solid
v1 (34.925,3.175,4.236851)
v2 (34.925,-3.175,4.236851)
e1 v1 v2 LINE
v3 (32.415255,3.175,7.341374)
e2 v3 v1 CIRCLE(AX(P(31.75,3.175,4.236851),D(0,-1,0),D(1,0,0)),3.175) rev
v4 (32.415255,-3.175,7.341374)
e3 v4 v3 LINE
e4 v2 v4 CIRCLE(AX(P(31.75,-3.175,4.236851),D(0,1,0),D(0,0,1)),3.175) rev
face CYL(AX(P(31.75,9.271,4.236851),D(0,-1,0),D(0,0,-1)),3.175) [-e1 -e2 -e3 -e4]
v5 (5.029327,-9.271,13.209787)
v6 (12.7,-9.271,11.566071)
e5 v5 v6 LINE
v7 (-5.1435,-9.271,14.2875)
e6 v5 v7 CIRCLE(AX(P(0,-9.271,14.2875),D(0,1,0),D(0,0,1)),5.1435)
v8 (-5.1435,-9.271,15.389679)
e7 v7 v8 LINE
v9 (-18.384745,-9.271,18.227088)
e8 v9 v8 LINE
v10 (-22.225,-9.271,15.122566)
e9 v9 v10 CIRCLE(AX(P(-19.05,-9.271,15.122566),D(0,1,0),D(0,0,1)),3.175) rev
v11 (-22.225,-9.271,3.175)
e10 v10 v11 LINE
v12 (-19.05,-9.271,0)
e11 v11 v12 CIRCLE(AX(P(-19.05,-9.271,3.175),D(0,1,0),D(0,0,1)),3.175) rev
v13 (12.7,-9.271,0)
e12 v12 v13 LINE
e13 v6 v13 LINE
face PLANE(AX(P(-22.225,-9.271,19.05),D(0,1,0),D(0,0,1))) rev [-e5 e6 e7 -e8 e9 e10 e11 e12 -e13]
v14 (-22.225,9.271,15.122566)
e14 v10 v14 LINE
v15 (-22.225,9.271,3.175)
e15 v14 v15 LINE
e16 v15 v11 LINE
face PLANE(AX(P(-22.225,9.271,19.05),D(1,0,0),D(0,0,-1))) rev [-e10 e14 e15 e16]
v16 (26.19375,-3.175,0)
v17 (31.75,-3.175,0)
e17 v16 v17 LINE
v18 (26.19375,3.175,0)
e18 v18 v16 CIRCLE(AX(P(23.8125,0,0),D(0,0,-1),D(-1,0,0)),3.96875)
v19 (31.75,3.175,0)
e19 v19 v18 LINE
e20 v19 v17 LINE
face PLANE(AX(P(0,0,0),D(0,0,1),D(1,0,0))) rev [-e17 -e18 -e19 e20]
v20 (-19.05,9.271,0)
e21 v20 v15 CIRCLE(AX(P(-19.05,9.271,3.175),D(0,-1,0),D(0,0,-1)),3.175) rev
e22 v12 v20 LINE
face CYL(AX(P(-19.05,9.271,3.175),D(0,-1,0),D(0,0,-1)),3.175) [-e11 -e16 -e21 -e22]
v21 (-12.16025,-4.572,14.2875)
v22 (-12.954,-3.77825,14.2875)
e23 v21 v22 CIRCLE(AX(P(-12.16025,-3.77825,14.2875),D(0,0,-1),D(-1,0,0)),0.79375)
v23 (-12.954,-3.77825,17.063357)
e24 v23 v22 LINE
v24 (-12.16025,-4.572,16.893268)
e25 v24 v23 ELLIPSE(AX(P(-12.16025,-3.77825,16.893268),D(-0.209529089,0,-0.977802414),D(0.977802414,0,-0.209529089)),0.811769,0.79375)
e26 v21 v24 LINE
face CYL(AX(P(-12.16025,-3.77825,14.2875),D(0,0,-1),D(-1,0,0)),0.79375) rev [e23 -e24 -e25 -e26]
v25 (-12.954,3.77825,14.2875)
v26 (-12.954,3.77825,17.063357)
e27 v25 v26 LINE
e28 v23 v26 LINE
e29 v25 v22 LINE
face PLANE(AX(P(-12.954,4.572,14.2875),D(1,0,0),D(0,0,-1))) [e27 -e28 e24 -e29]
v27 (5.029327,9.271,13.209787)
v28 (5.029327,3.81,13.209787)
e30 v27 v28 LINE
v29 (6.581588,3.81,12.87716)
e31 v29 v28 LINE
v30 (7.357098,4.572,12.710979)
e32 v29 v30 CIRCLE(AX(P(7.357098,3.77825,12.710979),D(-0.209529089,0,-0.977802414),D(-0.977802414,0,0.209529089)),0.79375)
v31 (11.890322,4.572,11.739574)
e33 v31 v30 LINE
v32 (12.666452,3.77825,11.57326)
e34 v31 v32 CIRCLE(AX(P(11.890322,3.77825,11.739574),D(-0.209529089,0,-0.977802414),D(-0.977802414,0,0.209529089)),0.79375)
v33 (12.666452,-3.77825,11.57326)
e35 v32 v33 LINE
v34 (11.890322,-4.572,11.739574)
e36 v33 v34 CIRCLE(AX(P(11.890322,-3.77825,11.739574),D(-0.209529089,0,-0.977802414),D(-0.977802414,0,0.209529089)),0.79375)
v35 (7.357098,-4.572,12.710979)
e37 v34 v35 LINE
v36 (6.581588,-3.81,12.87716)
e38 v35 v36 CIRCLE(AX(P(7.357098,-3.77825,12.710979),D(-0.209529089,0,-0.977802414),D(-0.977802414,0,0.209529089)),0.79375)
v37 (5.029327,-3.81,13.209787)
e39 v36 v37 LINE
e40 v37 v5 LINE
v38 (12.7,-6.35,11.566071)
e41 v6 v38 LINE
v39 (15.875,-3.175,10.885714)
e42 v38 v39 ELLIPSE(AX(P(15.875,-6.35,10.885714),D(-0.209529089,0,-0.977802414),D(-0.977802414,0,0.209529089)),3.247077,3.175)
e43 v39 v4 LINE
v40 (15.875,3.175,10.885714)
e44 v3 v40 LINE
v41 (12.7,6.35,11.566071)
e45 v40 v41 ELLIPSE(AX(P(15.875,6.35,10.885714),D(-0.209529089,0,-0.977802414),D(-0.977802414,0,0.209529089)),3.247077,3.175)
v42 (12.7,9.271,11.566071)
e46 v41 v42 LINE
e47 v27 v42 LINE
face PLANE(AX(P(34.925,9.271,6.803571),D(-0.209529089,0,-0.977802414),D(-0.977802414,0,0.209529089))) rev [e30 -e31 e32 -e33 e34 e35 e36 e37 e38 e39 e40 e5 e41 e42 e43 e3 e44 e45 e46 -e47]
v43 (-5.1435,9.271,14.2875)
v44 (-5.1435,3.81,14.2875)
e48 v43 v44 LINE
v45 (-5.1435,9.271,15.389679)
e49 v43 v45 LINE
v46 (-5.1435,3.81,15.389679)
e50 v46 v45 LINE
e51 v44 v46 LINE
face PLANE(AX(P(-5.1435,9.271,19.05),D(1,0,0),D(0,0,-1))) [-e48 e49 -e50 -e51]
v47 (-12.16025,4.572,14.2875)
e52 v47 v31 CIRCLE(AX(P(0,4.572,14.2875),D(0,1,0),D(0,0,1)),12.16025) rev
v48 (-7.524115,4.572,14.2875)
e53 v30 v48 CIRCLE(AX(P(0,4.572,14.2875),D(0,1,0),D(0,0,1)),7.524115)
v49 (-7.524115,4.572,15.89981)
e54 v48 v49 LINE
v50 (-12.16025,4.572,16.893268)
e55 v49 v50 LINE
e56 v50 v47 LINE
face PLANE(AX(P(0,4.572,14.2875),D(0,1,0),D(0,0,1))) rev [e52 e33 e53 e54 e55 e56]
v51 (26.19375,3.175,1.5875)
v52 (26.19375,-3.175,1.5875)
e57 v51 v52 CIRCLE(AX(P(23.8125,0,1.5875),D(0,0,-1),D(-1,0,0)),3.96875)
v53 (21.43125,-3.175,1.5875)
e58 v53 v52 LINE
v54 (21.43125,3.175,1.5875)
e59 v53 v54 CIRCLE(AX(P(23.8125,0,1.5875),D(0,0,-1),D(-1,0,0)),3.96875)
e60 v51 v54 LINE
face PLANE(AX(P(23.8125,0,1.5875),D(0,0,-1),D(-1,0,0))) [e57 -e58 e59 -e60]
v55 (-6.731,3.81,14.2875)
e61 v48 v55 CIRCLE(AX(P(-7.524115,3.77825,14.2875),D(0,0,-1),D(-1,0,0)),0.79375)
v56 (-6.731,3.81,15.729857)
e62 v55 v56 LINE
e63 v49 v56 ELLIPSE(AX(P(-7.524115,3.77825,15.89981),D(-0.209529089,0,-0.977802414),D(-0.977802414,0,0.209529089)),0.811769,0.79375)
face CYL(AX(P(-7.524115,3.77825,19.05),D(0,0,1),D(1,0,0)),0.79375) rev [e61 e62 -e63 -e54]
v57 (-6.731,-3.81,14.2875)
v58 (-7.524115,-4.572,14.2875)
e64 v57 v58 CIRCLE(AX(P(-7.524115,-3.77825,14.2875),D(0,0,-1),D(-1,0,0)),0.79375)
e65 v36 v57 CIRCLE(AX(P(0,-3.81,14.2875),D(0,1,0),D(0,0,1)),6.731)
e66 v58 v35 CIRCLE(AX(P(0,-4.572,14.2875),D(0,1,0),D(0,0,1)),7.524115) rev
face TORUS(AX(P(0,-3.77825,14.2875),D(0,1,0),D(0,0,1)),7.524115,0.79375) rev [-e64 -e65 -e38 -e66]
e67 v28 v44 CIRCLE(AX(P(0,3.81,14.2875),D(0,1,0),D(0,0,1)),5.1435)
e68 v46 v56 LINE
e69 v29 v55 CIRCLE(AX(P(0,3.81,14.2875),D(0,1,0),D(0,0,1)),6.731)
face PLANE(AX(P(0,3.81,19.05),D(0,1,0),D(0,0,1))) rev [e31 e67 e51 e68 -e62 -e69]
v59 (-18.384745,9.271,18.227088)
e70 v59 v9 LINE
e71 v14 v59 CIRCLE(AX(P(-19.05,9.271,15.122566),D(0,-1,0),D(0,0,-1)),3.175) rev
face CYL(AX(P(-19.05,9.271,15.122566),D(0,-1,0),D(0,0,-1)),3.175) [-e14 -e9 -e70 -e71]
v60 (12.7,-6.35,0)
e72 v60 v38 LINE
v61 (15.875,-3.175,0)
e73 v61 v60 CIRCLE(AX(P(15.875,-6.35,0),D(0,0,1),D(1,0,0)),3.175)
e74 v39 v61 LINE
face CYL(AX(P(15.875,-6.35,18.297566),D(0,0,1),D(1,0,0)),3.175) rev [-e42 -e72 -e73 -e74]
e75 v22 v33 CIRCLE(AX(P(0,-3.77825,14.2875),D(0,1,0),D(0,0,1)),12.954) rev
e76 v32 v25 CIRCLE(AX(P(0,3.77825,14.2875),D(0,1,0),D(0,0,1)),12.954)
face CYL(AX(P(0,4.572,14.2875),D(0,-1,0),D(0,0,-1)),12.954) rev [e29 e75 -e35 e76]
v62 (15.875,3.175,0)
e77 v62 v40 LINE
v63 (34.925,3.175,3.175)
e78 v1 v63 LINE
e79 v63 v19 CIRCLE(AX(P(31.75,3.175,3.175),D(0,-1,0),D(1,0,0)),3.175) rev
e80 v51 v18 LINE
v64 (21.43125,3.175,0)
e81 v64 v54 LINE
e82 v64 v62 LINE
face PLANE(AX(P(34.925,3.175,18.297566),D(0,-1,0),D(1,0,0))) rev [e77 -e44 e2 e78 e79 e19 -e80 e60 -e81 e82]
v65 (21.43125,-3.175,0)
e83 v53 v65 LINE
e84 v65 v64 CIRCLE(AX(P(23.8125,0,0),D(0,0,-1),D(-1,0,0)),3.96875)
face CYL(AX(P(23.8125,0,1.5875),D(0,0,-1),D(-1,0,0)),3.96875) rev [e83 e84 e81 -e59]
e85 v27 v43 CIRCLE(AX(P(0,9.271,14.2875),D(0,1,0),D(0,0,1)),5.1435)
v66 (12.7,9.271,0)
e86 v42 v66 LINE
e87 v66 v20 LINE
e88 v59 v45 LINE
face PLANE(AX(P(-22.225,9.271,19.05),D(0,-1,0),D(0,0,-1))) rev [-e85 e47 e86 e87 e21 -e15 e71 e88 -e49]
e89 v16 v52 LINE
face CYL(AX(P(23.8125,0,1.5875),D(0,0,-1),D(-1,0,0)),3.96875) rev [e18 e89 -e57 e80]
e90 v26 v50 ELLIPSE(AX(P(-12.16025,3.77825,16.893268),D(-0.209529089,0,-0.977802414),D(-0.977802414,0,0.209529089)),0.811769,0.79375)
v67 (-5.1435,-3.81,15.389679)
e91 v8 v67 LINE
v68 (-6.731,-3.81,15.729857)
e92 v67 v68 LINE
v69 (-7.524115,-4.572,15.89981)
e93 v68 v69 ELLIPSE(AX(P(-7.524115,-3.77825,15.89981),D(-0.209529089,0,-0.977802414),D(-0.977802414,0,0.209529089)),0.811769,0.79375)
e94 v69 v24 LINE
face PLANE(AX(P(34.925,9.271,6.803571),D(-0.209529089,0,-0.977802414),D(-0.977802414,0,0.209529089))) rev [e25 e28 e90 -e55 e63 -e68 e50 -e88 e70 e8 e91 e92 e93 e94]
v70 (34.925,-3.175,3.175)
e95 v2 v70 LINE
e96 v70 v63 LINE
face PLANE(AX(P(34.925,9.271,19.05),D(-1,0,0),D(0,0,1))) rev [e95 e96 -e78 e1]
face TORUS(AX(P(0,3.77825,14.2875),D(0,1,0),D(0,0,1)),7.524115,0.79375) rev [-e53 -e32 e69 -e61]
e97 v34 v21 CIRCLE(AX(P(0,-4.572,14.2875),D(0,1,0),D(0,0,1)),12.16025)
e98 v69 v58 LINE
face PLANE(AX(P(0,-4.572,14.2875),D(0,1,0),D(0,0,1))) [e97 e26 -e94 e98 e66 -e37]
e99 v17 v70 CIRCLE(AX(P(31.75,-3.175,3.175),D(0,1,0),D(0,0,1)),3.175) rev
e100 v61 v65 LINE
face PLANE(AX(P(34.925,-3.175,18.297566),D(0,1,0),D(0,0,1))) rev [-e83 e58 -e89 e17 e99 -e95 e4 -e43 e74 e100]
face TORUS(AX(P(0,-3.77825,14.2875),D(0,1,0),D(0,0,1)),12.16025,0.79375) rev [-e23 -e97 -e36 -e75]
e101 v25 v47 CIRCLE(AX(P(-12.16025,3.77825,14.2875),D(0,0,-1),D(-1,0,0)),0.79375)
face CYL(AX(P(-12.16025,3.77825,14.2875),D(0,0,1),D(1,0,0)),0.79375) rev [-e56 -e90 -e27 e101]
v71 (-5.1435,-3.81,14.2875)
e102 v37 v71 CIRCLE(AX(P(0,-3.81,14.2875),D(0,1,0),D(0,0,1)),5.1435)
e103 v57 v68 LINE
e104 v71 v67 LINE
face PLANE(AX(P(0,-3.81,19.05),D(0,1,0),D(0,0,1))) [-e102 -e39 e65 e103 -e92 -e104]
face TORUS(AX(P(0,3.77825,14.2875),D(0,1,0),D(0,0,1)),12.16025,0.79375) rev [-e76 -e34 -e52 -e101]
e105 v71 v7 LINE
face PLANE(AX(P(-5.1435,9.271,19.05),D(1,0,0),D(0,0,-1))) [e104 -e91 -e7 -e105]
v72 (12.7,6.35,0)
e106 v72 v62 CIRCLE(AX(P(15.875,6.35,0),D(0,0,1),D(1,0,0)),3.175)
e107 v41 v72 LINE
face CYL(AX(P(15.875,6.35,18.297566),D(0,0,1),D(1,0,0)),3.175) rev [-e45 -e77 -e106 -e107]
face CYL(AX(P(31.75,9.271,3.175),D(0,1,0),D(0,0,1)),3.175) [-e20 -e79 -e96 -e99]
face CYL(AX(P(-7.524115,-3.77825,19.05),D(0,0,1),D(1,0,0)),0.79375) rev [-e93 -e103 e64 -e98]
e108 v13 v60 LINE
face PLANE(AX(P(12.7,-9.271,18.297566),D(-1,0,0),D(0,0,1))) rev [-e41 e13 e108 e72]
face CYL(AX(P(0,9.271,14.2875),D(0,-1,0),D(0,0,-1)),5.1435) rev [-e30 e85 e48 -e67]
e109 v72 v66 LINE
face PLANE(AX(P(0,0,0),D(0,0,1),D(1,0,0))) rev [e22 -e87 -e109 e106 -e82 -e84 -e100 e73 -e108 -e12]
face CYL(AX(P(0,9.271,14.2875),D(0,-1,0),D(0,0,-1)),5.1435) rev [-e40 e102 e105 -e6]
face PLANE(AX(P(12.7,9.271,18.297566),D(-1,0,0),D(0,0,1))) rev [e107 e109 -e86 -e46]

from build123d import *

# Parameters (mm, degrees)
SKETCH1_W               = 57.15
SKETCH1_H               = 18.542
BOSS_EXTRUDE1_DEPTH     = 19.05
CUT_EXTRUDE1_DEPTH      = 41.848617676
CUT_EXTRUDE1_DEPTH_BACK = 41.848617676
CUT_EXTRUDE2_DEPTH      = 4.572
CUT_EXTRUDE2_DEPTH_BACK = 4.572
CUT_EXTRUDE3_DEPTH      = 3.81
CUT_EXTRUDE3_DEPTH_BACK = 3.81
CUT_EXTRUDE5_DEPTH      = 44.89150133
FILLET1_R               = 3.175
SKETCH9_R               = 3.96875
CUT_EXTRUDE6_DEPTH      = 1.5875
SKETCH10_W              = 22.225
SKETCH10_H              = 6.096
CUT_EXTRUDE7_DEPTH      = 41.503184716
FILLET2_R               = 3.175
FILLET3_R               = 0.79375


with BuildPart() as part:
    # Sketch1 → Boss-Extrude1 (new body)
    with BuildSketch(Plane.XY):
        with Locations((6.35, 0)):
            Rectangle(SKETCH1_W, SKETCH1_H)
    extrude(amount=BOSS_EXTRUDE1_DEPTH)

    # Sketch3 → Cut-Extrude1 (cut, two sides: drawn at the far end of the back side and taken through both)
    with BuildSketch(Plane(origin=(0, 0, 0), x_dir=(1, 0, 0), z_dir=(0, 1, 0)).offset(-CUT_EXTRUDE1_DEPTH_BACK)):
        with BuildLine():
            Line((-5.1435, -19.05), (-5.1435, -14.2875))
            ThreePointArc((-5.1435, -14.2875), (0, -9.144), (5.1435, -14.2875))
            Line((5.1435, -14.2875), (5.1435, -19.05))
            ThreePointArc((5.1435, -19.05), (0, -24.1935), (-5.1435, -19.05))
        make_face()
    extrude(amount=CUT_EXTRUDE1_DEPTH + CUT_EXTRUDE1_DEPTH_BACK, mode=Mode.SUBTRACT)

    # Sketch5 → Cut-Extrude2 (cut, two sides: drawn at the far end of the back side and taken through both)
    with BuildSketch(Plane(origin=(0, 0, 0), x_dir=(1, 0, 0), z_dir=(0, 1, 0)).offset(-CUT_EXTRUDE2_DEPTH_BACK)):
        with BuildLine():
            Line((12.954, -14.2875), (12.954, -19.05))
            ThreePointArc((12.954, -19.05), (0, -32.004), (-12.954, -19.05))
            Line((-12.954, -19.05), (-12.954, -14.2875))
            ThreePointArc((-12.954, -14.2875), (0, -1.3335), (12.954, -14.2875))
        make_face()
        with BuildLine():
            Line((-6.731, -19.05), (-6.731, -14.2875))
            ThreePointArc((-6.731, -14.2875), (0, -7.5565), (6.731, -14.2875))
            Line((6.731, -14.2875), (6.731, -19.05))
            ThreePointArc((6.731, -19.05), (0, -25.781), (-6.731, -19.05))
        make_face(mode=Mode.SUBTRACT)
    extrude(amount=CUT_EXTRUDE2_DEPTH + CUT_EXTRUDE2_DEPTH_BACK, mode=Mode.SUBTRACT)

    # Sketch6 → Cut-Extrude3 (cut, two sides: drawn at the far end of the back side and taken through both)
    with BuildSketch(Plane(origin=(0, 0, 0), x_dir=(1, 0, 0), z_dir=(0, 1, 0)).offset(-CUT_EXTRUDE3_DEPTH_BACK)):
        with BuildLine():
            Line((-8.3185, -19.05), (-8.3185, -14.2875))
            ThreePointArc((-8.3185, -14.2875), (0, -5.969), (8.3185, -14.2875))
            Line((8.3185, -14.2875), (8.3185, -19.05))
            ThreePointArc((8.3185, -19.05), (0, -27.3685), (-8.3185, -19.05))
        make_face()
    extrude(amount=CUT_EXTRUDE3_DEPTH + CUT_EXTRUDE3_DEPTH_BACK, mode=Mode.SUBTRACT)

    # Sketch8 → Cut-Extrude5 (cut, through all)
    with BuildSketch(Plane.XZ.offset(9.271)):
        Polygon((-22.225, 19.05), (34.925, 19.05), (34.925, 6.803571429), align=None)
    extrude(amount=-CUT_EXTRUDE5_DEPTH, mode=Mode.SUBTRACT)

    # Fillet1
    fillet1_edges = [part.edges().sort_by_distance(p)[0] for p in [
        (-22.225, 0, 19.05),
        (34.925, 0, 6.803571429),
        (-22.225, 0, 0),
        (34.925, 0, 0),
    ]]
    fillet(fillet1_edges, radius=FILLET1_R)

    # Sketch9 → Cut-Extrude6 (cut)
    with BuildSketch(Plane(origin=(0, 0, 0), x_dir=(-1, 0, 0), z_dir=(0, 0, -1))):
        with Locations((-23.8125, 0)):
            Circle(SKETCH9_R)
    extrude(amount=-CUT_EXTRUDE6_DEPTH, mode=Mode.SUBTRACT)

    # Sketch10 → Cut-Extrude7 (cut, through all)
    with BuildSketch(Plane(origin=(0, 0, 0), x_dir=(-1, 0, 0), z_dir=(0, 0, -1))):
        with Locations((-23.8125, 6.223)):
            Rectangle(SKETCH10_W, SKETCH10_H)
        with Locations((-23.8125, -6.223)):
            Rectangle(SKETCH10_W, SKETCH10_H)
    extrude(amount=-CUT_EXTRUDE7_DEPTH, mode=Mode.SUBTRACT)

    # Fillet2
    fillet2_edges = [part.edges().sort_by_distance(p)[0] for p in [
        (12.7, 3.175, 5.783035714),
        (12.7, -3.175, 5.783035714),
    ]]
    fillet(fillet2_edges, radius=FILLET2_R)

    # Fillet3
    # the kernel refuses this fillet: 0.79375 mm, written as the material it adds along each edge
    with BuildSketch(Plane(origin=(-6.731, 4.572, 17.714232143), x_dir=(-1, 0, 0), z_dir=(0, 0, -1))) as fillet3_piece_1_section:
        with BuildLine():
            CenterArc((FILLET3_R, -FILLET3_R), FILLET3_R, 90, 90)
            Line((0, -FILLET3_R), (0, 0))
            Line((0, 0), (FILLET3_R, 0))
        make_face()
    fillet3_piece_1 = extrude(amount=3.426732143, mode=Mode.PRIVATE)
    fillet3_piece_1 = split(fillet3_piece_1, bisect_by=Plane(origin=(-6.763728877, 4.396665284, 15.736870474), z_dir=(-0.2095290887308735, 0, -0.9778024140774095)), keep=Keep.TOP, mode=Mode.PRIVATE)
    fillet3_piece_1 = split(fillet3_piece_1, bisect_by=Plane(origin=(-6.915533266, 3.81, 15.028449993), z_dir=(0, 1, 0)), keep=Keep.TOP, mode=Mode.PRIVATE)
    add(fillet3_piece_1)
    with BuildSketch(Plane(origin=(-6.731, -4.572, 17.714232143), x_dir=(-1, 0, 0), z_dir=(0, 0, -1))) as fillet3_piece_2_section:
        with BuildLine():
            CenterArc((FILLET3_R, FILLET3_R), FILLET3_R, 180, 90)
            Line((0, FILLET3_R), (0, 0))
            Line((0, 0), (FILLET3_R, 0))
        make_face()
    fillet3_piece_2 = extrude(amount=3.426732143, mode=Mode.PRIVATE)
    fillet3_piece_2 = split(fillet3_piece_2, bisect_by=Plane(origin=(-6.763728877, -4.396665284, 15.736870474), z_dir=(-0.2095290887308735, 0, -0.9778024140774095)), keep=Keep.TOP, mode=Mode.PRIVATE)
    fillet3_piece_2 = split(fillet3_piece_2, bisect_by=Plane(origin=(-6.915533266, -3.81, 15.028449993), z_dir=(0, -1, 0)), keep=Keep.TOP, mode=Mode.PRIVATE)
    add(fillet3_piece_2)
    with BuildSketch(Plane(origin=(-12.954, -4.572, 19.047732143), x_dir=(1, 0, 0), z_dir=(0, 0, -1))) as fillet3_piece_3_section:
        with BuildLine():
            CenterArc((FILLET3_R, -FILLET3_R), FILLET3_R, 90, 90)
            Line((0, -FILLET3_R), (0, 0))
            Line((0, 0), (FILLET3_R, 0))
        make_face()
    fillet3_piece_3 = extrude(amount=4.760232143, mode=Mode.PRIVATE)
    fillet3_piece_3 = split(fillet3_piece_3, bisect_by=Plane(origin=(-12.496129388, -4.39094469, 16.965242012), z_dir=(-0.2095290887308735, 0, -0.9778024140774095)), keep=Keep.TOP, mode=Mode.PRIVATE)
    add(fillet3_piece_3)
    with BuildSketch(Plane(origin=(-12.954, 4.572, 19.047732143), x_dir=(1, 0, 0), z_dir=(0, 0, -1))) as fillet3_piece_4_section:
        with BuildLine():
            CenterArc((FILLET3_R, FILLET3_R), FILLET3_R, 180, 90)
            Line((0, FILLET3_R), (0, 0))
            Line((0, 0), (FILLET3_R, 0))
        make_face()
    fillet3_piece_4 = extrude(amount=4.760232143, mode=Mode.PRIVATE)
    fillet3_piece_4 = split(fillet3_piece_4, bisect_by=Plane(origin=(-12.496129388, 4.39094469, 16.965242012), z_dir=(-0.2095290887308735, 0, -0.9778024140774095)), keep=Keep.TOP, mode=Mode.PRIVATE)
    add(fillet3_piece_4)
    with BuildSketch(Plane(origin=(0, 4.572, 14.2875), x_dir=(-1, 0, 0), z_dir=(0, 0, 1))) as fillet3_piece_5_section:
        with BuildLine():
            CenterArc((6.731 + FILLET3_R, FILLET3_R), FILLET3_R, 180, 90)
            Line((6.731 + FILLET3_R, 0), (6.731, 0))
            Line((6.731, 0), (6.731, FILLET3_R))
        make_face()
    fillet3_piece_5 = revolve(axis=Axis((0, 4.572, 14.2875), (0, -1, 0)), revolution_arc=167.905242923, mode=Mode.PRIVATE)
    fillet3_piece_5 = split(fillet3_piece_5, bisect_by=Plane(origin=(-0.733722895, 3.81, 7.361688783), z_dir=(0, 1, 0)), keep=Keep.TOP, mode=Mode.PRIVATE)
    add(fillet3_piece_5)
    with BuildSketch(Plane(origin=(0, -4.572, 14.2875), x_dir=(-1, 0, 0), z_dir=(0, 0, 1))) as fillet3_piece_6_section:
        with BuildLine():
            CenterArc((6.731 + FILLET3_R, -FILLET3_R), FILLET3_R, 90, 90)
            Line((6.731, -FILLET3_R), (6.731, 0))
            Line((6.731, 0), (6.731 + FILLET3_R, 0))
        make_face()
    fillet3_piece_6 = revolve(axis=Axis((0, -4.572, 14.2875), (0, -1, 0)), revolution_arc=167.905242923, mode=Mode.PRIVATE)
    fillet3_piece_6 = split(fillet3_piece_6, bisect_by=Plane(origin=(-0.733722895, -3.81, 7.361688783), z_dir=(0, -1, 0)), keep=Keep.TOP, mode=Mode.PRIVATE)
    add(fillet3_piece_6)
    with BuildSketch(Plane(origin=(0, -4.572, 14.2875), x_dir=(-1, 0, 0), z_dir=(0, 0, 1))) as fillet3_piece_7:
        with BuildLine():
            CenterArc((12.954 - FILLET3_R, -FILLET3_R), FILLET3_R, 0, 90)
            Line((12.954 - FILLET3_R, 0), (12.954, 0))
            Line((12.954, 0), (12.954, -FILLET3_R))
        make_face()
    revolve(axis=Axis((0, -4.572, 14.2875), (0, -1, 0)), revolution_arc=167.905242923)
    with BuildSketch(Plane(origin=(0, 4.572, 14.2875), x_dir=(-1, 0, 0), z_dir=(0, 0, 1))) as fillet3_piece_8:
        with BuildLine():
            CenterArc((12.954 - FILLET3_R, FILLET3_R), FILLET3_R, 270, 90)
            Line((12.954, FILLET3_R), (12.954, 0))
            Line((12.954, 0), (12.954 - FILLET3_R, 0))
        make_face()
    revolve(axis=Axis((0, 4.572, 14.2875), (0, -1, 0)), revolution_arc=167.905242923)


solid = part.part
